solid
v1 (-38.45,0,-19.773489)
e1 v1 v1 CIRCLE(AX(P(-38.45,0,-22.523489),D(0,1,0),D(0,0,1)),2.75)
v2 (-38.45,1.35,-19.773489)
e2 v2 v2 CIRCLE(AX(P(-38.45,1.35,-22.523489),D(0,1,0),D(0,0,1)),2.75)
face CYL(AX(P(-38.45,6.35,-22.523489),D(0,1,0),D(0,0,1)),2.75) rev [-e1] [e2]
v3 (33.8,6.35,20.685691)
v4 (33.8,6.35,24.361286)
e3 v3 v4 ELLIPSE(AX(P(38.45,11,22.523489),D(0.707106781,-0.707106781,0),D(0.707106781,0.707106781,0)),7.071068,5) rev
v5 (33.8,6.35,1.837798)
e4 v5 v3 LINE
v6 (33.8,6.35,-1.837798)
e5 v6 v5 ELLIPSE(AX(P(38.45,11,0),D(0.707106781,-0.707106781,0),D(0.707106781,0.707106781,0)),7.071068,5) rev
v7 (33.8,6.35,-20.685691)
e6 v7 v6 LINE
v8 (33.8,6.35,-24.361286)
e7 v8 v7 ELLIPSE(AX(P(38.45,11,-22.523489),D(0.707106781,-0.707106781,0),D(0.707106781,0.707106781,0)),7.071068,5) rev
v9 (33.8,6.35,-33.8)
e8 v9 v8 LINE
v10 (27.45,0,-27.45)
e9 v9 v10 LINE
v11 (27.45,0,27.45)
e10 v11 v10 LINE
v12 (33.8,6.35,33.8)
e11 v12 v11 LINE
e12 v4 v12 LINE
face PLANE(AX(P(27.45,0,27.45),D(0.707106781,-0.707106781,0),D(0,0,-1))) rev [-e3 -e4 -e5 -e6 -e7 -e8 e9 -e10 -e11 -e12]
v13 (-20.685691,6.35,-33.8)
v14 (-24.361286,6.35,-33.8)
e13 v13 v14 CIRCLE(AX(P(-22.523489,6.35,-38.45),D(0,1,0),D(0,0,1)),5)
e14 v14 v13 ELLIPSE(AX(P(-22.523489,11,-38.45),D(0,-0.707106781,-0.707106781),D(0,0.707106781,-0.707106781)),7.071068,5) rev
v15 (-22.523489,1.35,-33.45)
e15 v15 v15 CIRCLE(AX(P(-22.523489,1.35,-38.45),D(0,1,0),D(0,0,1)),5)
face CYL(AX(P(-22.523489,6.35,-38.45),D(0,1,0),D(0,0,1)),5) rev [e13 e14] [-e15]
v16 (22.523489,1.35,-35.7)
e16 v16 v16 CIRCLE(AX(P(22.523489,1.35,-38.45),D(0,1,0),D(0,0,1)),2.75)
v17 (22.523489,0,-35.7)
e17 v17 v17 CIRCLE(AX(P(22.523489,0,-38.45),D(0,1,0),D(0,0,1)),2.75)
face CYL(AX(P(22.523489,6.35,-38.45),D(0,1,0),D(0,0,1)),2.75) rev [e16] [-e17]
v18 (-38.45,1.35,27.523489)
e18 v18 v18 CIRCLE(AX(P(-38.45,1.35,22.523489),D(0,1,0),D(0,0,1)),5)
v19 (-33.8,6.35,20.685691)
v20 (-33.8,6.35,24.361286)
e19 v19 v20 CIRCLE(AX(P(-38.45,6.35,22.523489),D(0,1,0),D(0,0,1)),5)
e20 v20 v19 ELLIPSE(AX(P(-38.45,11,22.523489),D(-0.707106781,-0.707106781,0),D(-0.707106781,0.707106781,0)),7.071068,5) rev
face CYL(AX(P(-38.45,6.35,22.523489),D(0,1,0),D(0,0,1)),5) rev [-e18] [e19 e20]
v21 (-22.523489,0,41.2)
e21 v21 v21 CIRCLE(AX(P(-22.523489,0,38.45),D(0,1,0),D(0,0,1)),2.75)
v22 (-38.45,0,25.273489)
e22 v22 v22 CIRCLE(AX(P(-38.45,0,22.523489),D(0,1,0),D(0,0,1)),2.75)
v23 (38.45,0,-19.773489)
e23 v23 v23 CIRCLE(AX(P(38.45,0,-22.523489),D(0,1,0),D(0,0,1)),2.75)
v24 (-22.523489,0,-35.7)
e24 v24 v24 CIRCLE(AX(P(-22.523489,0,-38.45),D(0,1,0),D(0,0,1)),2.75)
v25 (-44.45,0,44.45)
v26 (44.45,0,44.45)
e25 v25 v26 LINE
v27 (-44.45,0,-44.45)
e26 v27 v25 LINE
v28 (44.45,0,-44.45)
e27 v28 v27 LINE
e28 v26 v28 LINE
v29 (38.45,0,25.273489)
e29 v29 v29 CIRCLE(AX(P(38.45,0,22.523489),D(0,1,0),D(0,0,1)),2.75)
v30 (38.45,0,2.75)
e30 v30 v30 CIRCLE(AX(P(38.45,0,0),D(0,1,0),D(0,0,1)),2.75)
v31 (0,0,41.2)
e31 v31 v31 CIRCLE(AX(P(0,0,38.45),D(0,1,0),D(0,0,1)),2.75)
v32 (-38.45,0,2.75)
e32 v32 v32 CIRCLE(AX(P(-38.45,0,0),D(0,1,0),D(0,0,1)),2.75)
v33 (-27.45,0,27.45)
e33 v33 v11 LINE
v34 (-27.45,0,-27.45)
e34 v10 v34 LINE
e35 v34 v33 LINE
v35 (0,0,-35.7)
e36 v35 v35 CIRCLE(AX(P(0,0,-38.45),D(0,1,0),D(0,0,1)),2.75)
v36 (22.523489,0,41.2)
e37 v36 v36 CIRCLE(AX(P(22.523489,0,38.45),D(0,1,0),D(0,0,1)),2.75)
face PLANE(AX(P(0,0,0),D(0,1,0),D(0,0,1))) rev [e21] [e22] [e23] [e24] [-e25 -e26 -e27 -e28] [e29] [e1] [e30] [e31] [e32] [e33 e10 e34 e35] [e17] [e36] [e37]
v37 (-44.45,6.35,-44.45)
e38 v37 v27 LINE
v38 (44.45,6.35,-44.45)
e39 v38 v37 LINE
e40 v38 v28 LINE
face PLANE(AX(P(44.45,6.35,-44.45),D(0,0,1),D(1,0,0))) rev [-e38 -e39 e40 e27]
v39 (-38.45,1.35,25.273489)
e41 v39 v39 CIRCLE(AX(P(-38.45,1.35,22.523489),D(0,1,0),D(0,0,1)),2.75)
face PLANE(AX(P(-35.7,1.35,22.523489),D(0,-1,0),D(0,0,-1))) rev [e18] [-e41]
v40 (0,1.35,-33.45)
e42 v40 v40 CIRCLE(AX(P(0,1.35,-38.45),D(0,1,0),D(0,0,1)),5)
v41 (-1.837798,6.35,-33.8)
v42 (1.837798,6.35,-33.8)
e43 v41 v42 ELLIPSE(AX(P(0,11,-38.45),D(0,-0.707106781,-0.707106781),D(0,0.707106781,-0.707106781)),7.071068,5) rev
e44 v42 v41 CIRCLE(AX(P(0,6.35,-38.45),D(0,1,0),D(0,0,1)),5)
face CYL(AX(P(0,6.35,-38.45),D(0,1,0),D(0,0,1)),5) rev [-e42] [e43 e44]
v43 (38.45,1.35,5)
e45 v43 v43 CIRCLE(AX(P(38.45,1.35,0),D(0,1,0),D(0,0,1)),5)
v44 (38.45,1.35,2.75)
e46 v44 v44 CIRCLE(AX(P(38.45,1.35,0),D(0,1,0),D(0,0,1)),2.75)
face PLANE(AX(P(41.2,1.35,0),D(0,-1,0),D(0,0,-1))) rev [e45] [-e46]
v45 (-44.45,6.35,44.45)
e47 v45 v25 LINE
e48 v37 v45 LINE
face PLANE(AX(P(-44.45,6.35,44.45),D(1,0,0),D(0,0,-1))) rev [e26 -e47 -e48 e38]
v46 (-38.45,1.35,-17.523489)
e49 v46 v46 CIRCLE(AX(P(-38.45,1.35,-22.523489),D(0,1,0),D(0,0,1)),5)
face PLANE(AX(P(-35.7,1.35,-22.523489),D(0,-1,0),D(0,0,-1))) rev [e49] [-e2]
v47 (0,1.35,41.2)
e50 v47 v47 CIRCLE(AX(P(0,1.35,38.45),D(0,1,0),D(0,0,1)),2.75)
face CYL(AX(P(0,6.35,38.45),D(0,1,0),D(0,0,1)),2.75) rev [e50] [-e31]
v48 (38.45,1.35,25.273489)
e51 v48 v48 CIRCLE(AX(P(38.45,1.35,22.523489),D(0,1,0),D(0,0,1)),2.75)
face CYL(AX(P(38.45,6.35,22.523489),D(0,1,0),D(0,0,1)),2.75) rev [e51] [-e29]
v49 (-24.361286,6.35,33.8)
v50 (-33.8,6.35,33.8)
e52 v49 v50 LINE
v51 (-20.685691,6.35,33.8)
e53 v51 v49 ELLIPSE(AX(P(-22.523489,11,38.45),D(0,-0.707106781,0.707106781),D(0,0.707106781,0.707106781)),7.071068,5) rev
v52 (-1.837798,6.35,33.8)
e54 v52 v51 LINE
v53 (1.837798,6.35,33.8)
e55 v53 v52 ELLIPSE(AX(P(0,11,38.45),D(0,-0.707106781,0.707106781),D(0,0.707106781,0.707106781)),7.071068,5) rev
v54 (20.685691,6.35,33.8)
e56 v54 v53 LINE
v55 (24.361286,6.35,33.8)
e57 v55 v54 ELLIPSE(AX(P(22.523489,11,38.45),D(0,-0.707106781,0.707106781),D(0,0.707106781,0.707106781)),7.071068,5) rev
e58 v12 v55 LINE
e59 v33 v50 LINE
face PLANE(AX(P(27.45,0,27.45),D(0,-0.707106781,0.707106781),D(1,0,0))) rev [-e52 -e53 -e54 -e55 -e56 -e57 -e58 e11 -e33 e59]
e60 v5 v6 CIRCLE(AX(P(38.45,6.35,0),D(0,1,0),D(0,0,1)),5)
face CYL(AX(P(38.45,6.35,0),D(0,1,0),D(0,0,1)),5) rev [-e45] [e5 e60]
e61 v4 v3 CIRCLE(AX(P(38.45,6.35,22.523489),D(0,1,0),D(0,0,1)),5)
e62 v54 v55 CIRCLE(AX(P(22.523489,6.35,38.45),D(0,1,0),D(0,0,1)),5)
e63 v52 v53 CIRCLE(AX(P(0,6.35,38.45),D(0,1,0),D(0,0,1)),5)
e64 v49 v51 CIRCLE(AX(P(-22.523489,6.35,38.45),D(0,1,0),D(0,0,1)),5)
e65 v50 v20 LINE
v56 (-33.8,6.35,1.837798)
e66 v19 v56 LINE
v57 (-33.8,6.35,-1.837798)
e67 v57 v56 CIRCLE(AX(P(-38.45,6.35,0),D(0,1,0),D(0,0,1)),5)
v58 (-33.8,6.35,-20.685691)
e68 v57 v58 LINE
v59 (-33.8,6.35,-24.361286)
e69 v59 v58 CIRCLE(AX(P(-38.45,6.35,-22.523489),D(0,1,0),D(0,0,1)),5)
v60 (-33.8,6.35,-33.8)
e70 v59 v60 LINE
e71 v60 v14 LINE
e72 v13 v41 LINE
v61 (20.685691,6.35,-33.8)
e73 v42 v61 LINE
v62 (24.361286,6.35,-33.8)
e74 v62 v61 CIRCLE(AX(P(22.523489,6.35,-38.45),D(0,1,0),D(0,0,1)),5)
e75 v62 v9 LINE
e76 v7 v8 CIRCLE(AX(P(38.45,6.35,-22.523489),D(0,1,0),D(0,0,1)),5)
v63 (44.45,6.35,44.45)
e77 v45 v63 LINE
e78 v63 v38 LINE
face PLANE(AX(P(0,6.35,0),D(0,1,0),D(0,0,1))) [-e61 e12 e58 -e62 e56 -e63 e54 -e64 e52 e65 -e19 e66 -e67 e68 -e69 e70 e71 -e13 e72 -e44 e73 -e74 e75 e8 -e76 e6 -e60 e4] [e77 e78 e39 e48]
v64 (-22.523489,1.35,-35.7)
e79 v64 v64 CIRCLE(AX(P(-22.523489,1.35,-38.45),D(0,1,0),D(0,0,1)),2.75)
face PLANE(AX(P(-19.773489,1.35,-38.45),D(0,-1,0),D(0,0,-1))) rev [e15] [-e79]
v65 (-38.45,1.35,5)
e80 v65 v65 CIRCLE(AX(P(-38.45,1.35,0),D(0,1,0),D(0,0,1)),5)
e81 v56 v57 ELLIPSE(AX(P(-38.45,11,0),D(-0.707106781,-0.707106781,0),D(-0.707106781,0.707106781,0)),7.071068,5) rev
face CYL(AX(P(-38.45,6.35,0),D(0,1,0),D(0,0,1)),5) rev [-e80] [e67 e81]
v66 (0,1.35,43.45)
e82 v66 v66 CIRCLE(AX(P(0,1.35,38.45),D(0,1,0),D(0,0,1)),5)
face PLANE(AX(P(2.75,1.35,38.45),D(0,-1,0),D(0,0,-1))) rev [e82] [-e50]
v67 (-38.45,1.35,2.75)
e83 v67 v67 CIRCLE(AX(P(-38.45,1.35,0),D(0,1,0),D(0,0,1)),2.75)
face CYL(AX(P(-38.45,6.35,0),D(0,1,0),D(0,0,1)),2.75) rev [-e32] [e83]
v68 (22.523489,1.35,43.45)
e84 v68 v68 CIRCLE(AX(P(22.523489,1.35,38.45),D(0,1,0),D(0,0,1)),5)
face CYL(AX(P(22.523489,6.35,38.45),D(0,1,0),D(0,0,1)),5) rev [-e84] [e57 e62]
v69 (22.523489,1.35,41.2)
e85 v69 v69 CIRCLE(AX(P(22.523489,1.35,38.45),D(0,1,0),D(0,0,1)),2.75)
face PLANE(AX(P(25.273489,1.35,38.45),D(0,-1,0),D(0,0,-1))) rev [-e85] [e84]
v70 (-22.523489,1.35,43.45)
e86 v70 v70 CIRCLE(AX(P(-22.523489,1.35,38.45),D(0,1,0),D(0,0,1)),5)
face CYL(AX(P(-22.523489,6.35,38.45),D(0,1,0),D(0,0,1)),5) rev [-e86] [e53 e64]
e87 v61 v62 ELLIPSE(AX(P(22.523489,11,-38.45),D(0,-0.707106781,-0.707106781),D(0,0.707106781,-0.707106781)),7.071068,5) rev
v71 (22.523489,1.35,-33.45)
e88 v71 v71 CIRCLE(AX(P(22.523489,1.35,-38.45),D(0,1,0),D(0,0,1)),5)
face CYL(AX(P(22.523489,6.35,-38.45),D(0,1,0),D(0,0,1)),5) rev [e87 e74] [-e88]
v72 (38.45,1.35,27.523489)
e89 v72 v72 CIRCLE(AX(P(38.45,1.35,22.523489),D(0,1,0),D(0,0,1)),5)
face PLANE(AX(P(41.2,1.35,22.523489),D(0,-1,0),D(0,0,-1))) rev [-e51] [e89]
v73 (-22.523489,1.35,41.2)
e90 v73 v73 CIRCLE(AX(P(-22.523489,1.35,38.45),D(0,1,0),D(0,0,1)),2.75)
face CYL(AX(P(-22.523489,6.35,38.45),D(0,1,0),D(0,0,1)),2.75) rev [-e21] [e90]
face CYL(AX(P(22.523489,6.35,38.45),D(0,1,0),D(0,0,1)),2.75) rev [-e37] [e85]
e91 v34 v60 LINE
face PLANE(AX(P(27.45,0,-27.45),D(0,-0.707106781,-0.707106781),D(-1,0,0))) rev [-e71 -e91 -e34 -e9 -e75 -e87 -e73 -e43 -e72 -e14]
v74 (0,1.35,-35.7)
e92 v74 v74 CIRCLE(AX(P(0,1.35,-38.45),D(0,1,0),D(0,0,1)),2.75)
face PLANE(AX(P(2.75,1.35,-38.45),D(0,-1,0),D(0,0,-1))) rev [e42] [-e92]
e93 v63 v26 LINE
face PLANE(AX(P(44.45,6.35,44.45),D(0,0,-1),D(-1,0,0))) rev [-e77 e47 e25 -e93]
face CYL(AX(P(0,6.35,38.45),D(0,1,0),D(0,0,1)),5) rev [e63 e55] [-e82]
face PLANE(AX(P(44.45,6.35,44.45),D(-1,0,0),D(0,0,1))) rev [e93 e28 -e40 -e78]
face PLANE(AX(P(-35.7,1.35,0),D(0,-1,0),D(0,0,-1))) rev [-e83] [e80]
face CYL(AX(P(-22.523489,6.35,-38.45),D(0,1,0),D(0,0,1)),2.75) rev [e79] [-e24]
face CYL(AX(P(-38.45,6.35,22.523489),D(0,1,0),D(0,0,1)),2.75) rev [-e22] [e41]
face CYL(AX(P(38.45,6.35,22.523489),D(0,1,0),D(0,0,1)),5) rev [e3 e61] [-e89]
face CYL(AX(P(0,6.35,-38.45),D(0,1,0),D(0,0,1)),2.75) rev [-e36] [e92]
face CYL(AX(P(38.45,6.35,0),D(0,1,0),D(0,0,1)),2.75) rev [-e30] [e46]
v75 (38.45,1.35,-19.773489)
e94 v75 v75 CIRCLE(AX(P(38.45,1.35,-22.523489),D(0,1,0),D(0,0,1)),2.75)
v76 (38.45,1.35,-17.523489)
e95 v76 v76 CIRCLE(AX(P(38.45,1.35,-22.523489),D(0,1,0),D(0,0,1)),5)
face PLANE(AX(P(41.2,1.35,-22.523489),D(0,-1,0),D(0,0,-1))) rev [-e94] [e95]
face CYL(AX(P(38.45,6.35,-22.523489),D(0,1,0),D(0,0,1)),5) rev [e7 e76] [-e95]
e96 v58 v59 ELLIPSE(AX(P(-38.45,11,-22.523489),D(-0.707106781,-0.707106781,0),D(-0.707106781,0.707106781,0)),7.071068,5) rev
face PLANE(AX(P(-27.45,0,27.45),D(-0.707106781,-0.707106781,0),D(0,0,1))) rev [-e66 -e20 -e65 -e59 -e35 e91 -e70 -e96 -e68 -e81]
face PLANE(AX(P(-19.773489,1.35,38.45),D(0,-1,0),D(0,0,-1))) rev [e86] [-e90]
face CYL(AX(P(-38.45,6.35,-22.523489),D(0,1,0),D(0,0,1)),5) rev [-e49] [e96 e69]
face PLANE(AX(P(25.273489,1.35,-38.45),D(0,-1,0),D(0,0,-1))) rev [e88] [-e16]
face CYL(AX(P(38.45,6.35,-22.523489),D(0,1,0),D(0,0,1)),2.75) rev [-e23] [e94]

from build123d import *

# Parameters (mm, degrees)
SKETCH1_W                      = 88.9
SKETCH1_H                      = 88.9
SKETCH1_W_2                    = 54.9
SKETCH1_H_2                    = 54.9
BOSS_EXTRUDE1_DEPTH            = 6.35
CHAMFER1_SIZE                  = 6.35
CBORE_FOR_M5_SHCS3_D           = 5.5
CBORE_FOR_M5_SHCS3_CBORE_D     = 10
CBORE_FOR_M5_SHCS3_CBORE_DEPTH = 5


with BuildPart() as part:
    # Sketch1 → Boss-Extrude1 (new body)
    with BuildSketch(Plane(origin=(0, 0, 0), x_dir=(1, 0, 0), z_dir=(0, 1, 0))):
        Rectangle(SKETCH1_W, SKETCH1_H)
        Rectangle(SKETCH1_W_2, SKETCH1_H_2, mode=Mode.SUBTRACT)
    extrude(amount=BOSS_EXTRUDE1_DEPTH)

    # Chamfer1
    chamfer1_edges = [part.edges().sort_by_distance(p)[0] for p in [
        (0, 6.35, 27.45),
        (27.45, 6.35, 0),
        (-27.45, 6.35, 0),
        (0, 6.35, -27.45),
    ]]
    chamfer(chamfer1_edges, length=CHAMFER1_SIZE - 0.0001)  # a hair under: the kernel refuses the full size

    # CBORE for M5 SHCS3 (through all)
    with Locations(Plane(origin=(0, 6.35, 0), x_dir=(1, 0, 0), z_dir=(0, 1, 0))):
        with Locations((-22.523488527, 38.45), (0, 38.45), (22.523488527, 38.45), (38.45, 22.523488527), (38.45, 0), (38.45, -22.523488527), (22.523488527, -38.45), (0, -38.45), (-22.523488527, -38.45), (-38.45, -22.523488527), (-38.45, 0), (-38.45, 22.523488527)):
            CounterBoreHole(CBORE_FOR_M5_SHCS3_D / 2, CBORE_FOR_M5_SHCS3_CBORE_D / 2, CBORE_FOR_M5_SHCS3_CBORE_DEPTH)


solid = part.part
